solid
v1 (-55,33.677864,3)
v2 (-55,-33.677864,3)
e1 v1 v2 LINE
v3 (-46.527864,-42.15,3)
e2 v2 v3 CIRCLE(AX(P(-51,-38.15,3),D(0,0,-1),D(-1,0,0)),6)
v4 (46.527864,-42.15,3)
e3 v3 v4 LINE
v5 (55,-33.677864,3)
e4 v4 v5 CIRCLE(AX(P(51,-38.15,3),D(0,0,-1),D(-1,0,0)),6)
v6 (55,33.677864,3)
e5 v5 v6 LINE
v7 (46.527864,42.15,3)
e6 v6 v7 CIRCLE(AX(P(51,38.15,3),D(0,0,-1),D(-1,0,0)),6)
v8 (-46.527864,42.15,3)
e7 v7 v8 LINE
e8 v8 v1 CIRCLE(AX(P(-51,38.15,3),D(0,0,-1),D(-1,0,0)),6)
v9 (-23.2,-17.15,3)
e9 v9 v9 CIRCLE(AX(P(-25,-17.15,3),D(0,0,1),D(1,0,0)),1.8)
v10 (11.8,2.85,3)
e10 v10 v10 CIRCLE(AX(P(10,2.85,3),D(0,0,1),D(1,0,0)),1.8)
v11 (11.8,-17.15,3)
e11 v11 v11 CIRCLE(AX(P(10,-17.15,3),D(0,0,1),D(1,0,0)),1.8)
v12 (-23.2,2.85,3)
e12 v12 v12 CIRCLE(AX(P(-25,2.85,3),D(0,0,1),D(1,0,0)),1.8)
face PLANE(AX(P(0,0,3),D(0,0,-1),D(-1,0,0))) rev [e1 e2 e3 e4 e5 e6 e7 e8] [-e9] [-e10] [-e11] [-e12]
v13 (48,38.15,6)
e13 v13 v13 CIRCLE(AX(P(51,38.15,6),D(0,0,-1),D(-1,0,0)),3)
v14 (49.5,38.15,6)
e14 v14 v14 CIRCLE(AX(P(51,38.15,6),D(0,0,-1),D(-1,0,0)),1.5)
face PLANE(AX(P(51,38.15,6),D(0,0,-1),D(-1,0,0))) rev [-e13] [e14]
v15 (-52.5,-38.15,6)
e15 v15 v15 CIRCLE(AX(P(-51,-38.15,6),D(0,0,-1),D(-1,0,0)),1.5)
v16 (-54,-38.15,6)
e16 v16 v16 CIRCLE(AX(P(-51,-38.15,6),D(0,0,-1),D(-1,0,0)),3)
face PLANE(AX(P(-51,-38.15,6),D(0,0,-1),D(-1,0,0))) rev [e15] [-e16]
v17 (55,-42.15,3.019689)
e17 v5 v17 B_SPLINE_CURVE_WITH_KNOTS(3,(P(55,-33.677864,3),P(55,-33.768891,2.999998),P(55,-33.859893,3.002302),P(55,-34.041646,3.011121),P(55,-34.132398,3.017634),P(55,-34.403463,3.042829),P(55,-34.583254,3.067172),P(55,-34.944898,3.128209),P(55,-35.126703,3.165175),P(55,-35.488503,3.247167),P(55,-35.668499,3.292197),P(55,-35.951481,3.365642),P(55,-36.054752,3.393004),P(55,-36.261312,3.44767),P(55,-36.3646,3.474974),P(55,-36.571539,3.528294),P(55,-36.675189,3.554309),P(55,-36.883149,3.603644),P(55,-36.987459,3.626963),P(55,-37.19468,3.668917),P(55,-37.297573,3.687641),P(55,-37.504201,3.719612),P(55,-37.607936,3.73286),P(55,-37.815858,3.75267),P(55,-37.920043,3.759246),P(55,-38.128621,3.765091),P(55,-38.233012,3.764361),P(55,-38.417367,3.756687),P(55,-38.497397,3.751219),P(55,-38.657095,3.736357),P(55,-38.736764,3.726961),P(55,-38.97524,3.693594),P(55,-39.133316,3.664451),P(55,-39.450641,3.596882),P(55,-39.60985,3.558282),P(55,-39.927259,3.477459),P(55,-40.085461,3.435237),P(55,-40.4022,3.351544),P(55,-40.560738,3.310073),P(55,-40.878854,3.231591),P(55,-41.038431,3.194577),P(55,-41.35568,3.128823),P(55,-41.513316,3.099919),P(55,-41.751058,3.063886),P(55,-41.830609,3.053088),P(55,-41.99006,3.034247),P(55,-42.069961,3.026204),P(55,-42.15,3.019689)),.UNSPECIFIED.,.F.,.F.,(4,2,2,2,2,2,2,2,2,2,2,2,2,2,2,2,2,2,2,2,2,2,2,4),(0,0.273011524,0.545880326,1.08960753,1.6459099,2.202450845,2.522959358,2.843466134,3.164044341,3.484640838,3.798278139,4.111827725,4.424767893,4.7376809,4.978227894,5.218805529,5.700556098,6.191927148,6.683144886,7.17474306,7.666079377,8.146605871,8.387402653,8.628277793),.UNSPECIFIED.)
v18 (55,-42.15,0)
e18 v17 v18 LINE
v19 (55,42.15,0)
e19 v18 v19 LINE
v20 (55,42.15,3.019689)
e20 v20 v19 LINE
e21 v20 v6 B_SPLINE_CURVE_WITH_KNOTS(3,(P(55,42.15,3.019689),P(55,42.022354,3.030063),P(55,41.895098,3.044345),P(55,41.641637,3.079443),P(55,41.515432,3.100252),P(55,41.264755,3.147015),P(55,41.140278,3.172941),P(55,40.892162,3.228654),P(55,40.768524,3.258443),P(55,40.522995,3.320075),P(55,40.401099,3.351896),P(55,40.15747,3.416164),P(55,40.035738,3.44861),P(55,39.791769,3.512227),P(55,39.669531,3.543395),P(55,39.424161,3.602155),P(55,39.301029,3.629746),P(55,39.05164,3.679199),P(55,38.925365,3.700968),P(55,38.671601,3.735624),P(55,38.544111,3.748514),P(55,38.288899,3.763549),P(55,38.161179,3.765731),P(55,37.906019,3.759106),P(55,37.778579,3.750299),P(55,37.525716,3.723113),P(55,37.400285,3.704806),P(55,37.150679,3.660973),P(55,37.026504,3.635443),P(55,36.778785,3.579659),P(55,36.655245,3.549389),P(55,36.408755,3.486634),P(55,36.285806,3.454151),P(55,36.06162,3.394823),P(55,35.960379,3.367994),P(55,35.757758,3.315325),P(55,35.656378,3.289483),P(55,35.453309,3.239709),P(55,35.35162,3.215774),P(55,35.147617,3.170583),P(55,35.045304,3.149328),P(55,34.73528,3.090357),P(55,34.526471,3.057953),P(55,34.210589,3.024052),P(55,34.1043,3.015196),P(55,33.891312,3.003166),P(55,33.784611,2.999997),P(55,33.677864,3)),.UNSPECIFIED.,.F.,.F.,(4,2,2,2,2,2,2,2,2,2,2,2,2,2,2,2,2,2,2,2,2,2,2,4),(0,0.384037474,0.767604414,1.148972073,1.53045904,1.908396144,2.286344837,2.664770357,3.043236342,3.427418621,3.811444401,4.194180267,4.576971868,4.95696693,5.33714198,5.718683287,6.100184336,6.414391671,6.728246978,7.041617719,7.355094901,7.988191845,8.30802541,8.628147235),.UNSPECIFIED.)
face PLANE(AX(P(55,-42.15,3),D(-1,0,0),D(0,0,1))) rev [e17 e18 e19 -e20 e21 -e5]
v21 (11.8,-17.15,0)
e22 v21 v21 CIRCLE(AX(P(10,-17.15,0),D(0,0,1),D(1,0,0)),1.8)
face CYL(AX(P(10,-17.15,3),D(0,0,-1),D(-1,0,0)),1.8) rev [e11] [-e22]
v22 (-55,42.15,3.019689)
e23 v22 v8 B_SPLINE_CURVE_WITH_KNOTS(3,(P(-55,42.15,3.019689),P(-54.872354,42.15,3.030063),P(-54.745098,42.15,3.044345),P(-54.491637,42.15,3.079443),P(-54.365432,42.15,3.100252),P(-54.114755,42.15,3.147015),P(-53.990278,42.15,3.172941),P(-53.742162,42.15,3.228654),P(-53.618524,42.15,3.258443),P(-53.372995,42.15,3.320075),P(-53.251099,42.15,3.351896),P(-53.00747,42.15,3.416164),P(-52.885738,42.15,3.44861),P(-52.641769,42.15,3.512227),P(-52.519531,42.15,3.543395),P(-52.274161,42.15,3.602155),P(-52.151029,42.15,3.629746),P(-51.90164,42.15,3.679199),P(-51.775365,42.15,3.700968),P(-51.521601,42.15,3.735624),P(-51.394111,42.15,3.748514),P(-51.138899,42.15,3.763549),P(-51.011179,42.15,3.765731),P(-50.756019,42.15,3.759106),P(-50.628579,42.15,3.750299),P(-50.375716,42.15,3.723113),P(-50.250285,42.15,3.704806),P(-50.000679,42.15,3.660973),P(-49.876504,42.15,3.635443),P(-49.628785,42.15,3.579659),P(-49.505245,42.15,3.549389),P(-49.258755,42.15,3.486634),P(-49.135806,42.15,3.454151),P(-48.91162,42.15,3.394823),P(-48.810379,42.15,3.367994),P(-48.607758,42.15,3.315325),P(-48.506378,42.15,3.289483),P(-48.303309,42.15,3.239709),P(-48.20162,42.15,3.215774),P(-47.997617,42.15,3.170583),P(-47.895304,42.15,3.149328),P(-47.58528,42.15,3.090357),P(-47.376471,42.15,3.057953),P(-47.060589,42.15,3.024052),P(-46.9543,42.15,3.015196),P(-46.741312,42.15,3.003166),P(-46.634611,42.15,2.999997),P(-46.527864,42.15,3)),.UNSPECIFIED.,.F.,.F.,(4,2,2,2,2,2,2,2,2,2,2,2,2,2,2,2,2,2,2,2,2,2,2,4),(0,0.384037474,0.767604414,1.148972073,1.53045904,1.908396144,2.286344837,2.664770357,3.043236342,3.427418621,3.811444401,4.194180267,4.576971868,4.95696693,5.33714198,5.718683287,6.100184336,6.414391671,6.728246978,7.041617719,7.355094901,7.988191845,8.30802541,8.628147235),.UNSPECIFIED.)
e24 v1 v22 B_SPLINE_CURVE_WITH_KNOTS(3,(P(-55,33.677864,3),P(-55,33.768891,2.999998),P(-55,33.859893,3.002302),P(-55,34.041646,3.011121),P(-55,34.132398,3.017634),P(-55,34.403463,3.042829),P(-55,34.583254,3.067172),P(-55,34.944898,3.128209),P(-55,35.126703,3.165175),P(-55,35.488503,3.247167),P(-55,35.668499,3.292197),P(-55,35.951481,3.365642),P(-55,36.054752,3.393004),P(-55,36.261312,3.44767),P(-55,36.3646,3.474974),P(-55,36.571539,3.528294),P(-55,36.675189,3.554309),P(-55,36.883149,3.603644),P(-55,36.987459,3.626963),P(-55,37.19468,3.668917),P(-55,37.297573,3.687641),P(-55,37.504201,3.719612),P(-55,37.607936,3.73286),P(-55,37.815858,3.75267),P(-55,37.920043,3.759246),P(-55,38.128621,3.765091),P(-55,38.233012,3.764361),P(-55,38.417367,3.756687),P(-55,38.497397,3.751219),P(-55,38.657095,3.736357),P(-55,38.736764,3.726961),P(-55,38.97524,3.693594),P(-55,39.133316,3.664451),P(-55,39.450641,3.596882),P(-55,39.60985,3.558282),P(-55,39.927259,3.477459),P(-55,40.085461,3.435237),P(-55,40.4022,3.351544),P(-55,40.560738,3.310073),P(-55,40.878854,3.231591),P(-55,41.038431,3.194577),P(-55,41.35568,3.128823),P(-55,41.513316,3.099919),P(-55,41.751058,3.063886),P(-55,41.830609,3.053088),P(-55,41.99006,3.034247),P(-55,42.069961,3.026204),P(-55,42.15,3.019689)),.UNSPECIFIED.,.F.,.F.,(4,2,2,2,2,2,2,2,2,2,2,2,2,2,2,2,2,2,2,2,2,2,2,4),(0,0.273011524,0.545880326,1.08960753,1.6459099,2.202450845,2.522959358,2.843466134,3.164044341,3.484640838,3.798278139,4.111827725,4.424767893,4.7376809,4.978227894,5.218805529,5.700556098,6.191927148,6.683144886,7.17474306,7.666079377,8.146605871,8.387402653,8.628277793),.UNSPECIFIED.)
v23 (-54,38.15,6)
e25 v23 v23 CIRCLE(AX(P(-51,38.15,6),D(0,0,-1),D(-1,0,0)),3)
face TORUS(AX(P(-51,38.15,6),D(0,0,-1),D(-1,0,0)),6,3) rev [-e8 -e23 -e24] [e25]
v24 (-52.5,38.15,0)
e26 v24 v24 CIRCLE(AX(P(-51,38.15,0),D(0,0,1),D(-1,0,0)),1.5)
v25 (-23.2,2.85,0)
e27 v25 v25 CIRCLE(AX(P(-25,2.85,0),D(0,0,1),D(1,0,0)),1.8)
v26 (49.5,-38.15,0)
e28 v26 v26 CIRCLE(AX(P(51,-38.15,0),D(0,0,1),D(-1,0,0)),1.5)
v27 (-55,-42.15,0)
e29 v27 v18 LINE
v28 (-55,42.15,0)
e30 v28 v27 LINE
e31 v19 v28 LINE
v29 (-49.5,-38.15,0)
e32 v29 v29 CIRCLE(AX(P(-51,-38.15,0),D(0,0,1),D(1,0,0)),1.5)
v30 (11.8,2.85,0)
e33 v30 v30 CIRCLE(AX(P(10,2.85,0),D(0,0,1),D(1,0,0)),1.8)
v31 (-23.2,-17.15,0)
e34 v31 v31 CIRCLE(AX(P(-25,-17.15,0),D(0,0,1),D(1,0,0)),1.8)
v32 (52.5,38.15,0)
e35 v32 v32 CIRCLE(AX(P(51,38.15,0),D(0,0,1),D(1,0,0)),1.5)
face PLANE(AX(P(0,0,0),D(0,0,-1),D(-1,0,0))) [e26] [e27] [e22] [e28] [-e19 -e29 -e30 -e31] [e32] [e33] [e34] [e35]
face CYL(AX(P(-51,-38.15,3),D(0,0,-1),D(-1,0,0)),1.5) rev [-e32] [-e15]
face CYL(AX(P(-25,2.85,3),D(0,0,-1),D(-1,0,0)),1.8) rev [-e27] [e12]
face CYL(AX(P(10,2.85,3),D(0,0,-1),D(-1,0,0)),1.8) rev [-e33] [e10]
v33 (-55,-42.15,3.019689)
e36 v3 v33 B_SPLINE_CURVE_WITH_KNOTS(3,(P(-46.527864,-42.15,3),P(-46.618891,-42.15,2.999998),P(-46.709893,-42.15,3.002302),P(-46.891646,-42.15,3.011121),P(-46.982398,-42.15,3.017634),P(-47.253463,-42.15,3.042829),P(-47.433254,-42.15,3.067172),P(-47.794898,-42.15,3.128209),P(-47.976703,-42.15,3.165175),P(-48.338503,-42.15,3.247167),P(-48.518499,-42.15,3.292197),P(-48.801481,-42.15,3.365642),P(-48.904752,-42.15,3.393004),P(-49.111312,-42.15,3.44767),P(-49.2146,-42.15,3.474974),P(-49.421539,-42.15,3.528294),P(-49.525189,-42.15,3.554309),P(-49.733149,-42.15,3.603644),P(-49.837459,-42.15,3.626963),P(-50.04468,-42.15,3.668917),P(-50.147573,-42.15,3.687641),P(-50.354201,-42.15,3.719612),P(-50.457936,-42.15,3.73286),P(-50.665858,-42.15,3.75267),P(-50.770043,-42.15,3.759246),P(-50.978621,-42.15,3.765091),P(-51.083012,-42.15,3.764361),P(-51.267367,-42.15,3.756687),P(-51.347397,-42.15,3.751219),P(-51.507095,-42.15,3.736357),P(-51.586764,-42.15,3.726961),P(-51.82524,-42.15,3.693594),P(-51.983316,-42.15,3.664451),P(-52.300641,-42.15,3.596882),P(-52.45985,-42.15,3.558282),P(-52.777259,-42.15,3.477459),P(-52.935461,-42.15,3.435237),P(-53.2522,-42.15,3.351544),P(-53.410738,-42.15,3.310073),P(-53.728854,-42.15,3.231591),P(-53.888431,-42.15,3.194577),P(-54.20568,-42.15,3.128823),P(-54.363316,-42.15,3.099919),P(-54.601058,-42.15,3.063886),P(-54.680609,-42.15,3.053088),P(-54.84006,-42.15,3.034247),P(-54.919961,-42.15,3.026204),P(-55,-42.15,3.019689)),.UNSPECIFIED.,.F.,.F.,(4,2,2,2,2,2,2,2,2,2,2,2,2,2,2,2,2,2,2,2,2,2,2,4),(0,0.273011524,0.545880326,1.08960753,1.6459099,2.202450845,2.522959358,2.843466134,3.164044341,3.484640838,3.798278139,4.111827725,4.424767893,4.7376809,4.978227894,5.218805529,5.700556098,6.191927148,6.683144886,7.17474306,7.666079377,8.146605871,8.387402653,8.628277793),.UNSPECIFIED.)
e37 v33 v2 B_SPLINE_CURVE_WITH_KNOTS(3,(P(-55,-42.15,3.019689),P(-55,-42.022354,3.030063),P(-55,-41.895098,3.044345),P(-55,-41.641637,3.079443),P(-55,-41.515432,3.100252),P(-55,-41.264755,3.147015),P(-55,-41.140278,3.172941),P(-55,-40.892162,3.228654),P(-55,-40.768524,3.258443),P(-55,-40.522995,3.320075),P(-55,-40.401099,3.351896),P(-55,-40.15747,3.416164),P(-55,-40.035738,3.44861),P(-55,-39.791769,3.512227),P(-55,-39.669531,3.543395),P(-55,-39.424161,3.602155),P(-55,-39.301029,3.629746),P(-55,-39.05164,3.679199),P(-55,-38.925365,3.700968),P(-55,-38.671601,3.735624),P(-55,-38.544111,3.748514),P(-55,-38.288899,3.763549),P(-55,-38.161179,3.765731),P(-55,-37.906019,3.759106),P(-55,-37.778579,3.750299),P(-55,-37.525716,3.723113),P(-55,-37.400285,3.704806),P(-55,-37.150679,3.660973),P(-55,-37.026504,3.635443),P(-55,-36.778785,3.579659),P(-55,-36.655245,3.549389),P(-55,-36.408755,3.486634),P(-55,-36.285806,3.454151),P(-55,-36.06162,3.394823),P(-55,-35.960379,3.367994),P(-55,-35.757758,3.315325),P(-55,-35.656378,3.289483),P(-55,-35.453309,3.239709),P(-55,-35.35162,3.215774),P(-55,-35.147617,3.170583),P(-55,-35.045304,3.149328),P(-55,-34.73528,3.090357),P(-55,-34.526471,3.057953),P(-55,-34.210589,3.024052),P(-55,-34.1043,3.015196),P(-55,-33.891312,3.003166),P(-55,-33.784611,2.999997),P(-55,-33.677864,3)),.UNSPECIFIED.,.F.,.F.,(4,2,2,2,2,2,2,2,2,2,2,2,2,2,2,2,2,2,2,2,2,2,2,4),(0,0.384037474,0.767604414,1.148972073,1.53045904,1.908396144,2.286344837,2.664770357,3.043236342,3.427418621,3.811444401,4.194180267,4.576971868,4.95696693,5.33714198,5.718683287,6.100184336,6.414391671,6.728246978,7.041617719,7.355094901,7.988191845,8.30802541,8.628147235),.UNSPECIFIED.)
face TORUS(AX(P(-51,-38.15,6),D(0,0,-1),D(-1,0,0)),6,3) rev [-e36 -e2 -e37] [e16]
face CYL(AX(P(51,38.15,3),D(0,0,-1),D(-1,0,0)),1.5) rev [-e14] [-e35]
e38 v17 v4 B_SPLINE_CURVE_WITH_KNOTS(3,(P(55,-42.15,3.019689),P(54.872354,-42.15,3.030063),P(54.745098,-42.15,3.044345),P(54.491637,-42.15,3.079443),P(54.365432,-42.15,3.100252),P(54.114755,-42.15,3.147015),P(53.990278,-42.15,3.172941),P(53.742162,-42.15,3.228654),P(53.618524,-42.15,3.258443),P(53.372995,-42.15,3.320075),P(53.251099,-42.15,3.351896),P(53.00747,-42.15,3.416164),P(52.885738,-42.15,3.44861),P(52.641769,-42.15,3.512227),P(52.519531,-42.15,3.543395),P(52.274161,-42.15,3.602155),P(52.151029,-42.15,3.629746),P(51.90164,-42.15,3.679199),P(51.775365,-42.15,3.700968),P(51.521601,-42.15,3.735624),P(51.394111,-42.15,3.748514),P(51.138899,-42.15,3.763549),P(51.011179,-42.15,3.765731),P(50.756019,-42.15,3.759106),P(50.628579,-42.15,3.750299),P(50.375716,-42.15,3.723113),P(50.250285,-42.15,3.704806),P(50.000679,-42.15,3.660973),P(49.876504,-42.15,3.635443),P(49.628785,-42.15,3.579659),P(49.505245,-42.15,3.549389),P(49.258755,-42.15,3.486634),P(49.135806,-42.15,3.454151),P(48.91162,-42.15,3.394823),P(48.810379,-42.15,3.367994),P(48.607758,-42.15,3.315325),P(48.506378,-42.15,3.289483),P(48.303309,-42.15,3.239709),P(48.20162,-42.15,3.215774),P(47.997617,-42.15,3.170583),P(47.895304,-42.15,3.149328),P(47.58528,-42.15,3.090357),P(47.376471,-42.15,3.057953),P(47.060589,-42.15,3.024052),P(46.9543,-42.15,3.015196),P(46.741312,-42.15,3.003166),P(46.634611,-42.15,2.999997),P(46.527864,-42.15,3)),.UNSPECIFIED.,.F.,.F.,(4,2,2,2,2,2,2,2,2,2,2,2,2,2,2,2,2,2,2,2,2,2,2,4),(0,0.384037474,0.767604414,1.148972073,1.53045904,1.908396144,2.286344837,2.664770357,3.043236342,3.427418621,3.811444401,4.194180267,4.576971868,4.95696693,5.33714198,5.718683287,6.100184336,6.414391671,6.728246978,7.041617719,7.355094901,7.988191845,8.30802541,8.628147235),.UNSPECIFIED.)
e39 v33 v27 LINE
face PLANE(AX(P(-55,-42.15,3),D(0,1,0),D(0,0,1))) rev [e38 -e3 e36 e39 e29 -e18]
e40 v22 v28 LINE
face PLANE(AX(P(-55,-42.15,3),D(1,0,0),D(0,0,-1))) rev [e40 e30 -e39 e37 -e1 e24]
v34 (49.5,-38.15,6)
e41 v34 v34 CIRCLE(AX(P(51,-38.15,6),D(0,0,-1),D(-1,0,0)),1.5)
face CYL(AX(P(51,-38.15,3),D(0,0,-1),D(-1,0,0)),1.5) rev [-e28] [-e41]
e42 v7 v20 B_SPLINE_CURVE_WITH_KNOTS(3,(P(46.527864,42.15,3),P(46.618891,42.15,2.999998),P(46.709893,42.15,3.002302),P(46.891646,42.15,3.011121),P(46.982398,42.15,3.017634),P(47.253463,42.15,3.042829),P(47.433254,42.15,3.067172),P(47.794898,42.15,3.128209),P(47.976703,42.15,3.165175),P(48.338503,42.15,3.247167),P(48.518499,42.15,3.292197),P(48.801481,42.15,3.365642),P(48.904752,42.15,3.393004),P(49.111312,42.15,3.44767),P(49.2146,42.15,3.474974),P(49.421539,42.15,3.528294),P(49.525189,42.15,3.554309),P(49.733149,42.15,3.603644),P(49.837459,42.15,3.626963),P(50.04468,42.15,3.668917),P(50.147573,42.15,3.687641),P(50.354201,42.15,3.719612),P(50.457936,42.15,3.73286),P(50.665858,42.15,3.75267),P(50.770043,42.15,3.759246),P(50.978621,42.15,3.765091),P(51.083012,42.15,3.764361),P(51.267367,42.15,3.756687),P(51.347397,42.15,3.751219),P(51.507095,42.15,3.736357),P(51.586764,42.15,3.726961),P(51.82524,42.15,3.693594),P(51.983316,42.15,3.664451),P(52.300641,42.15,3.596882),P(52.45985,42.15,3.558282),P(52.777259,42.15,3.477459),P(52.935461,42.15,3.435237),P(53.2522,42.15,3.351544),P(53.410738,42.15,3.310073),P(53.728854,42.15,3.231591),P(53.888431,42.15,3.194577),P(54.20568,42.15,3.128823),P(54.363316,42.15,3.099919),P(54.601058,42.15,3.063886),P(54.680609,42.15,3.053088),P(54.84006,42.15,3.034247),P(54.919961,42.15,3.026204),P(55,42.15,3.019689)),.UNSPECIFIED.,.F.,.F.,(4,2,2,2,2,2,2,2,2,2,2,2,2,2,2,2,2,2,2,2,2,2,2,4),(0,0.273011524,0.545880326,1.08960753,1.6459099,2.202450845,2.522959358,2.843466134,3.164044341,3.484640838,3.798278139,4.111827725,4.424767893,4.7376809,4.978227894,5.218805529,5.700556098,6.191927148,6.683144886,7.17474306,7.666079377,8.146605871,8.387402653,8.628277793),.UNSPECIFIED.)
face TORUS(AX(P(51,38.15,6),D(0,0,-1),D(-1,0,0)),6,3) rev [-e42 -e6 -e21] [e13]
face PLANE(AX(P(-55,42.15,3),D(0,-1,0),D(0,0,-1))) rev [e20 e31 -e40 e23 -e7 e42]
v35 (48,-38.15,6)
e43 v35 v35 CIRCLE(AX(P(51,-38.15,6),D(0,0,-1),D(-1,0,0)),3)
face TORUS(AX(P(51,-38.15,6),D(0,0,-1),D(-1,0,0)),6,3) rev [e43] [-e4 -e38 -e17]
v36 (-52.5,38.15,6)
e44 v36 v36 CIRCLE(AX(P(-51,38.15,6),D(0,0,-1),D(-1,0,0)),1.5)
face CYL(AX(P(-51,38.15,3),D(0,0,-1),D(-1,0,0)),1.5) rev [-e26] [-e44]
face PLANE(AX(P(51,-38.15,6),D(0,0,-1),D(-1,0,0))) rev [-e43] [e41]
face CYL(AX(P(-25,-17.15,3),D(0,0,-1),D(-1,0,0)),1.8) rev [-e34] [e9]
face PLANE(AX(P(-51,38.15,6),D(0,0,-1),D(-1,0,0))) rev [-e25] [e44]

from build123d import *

# Parameters (mm, degrees)
SKETCH1_W           = 110
SKETCH1_H           = 84.3
SKETCH1_R           = 1.5
SKETCH1_R_2         = 1.8
BOSS_EXTRUDE1_DEPTH = 3
BOSS_EXTRUDE2_START = 3
SKETCH2_R           = 3
SKETCH2_R_2         = 1.5
BOSS_EXTRUDE2_DEPTH = 3
FILLET1_R           = 3


with BuildPart() as part:
    # Sketch1 → Boss-Extrude1 (new body)
    with BuildSketch(Plane.XY):
        Rectangle(SKETCH1_W, SKETCH1_H)
        with Locations((51, 38.15)):
            Circle(SKETCH1_R, mode=Mode.SUBTRACT)
        with Locations(Location((-51, 38.15, 0), (0, 0, 180))):
            Circle(SKETCH1_R, mode=Mode.SUBTRACT)
        with Locations(Location((51, -38.15, 0), (0, 0, 180))):
            Circle(SKETCH1_R, mode=Mode.SUBTRACT)
        with Locations((-51, -38.15)):
            Circle(SKETCH1_R, mode=Mode.SUBTRACT)
        with Locations((-25, -17.15)):
            Circle(SKETCH1_R_2, mode=Mode.SUBTRACT)
        with Locations((-25, 2.85)):
            Circle(SKETCH1_R_2, mode=Mode.SUBTRACT)
        with Locations((10, 2.85)):
            Circle(SKETCH1_R_2, mode=Mode.SUBTRACT)
        with Locations((10, -17.15)):
            Circle(SKETCH1_R_2, mode=Mode.SUBTRACT)
    extrude(amount=BOSS_EXTRUDE1_DEPTH)

    # Sketch2 → Boss-Extrude2 (add)
    # profile 1 of 4: a face of its own
    with BuildSketch(Plane.XY.offset(BOSS_EXTRUDE2_START)):
        with Locations(Location((-51, 38.15, 0), (0, 0, 180))):
            Circle(SKETCH2_R)
        with Locations(Location((-51, 38.15, 0), (0, 0, 180))):
            Circle(SKETCH2_R_2, mode=Mode.SUBTRACT)
    # profile 2 of 4: a face of its own
    with BuildSketch(Plane.XY.offset(BOSS_EXTRUDE2_START)):
        with Locations(Location((51, 38.15, 0), (0, 0, 180))):
            Circle(SKETCH2_R)
        with Locations(Location((51, 38.15, 0), (0, 0, 180))):
            Circle(SKETCH2_R_2, mode=Mode.SUBTRACT)
    # profile 3 of 4: a face of its own
    with BuildSketch(Plane.XY.offset(BOSS_EXTRUDE2_START)):
        with Locations(Location((51, -38.15, 0), (0, 0, 180))):
            Circle(SKETCH2_R)
        with Locations(Location((51, -38.15, 0), (0, 0, 180))):
            Circle(SKETCH2_R_2, mode=Mode.SUBTRACT)
    # profile 4 of 4: a face of its own
    with BuildSketch(Plane.XY.offset(BOSS_EXTRUDE2_START)):
        with Locations(Location((-51, -38.15, 0), (0, 0, 180))):
            Circle(SKETCH2_R)
        with Locations(Location((-51, -38.15, 0), (0, 0, 180))):
            Circle(SKETCH2_R_2, mode=Mode.SUBTRACT)
    extrude(amount=BOSS_EXTRUDE2_DEPTH)

    # Fillet1
    # the kernel refuses this fillet: 3 mm, written as the material it adds along each edge
    with BuildSketch(Plane(origin=(-51, 38.15, 3), x_dir=(-1, 0, 0), z_dir=(0, 1, 0))) as fillet1_piece_1_section:
        with BuildLine():
            CenterArc((3 + FILLET1_R, FILLET1_R), FILLET1_R, 180, 90)
            Line((3, FILLET1_R), (3, 0))
            Line((3, 0), (3 + FILLET1_R, 0))
        make_face()
    fillet1_piece_1 = revolve(axis=Axis((-51, 38.15, 3), (0, 0, 1)), mode=Mode.PRIVATE)
    fillet1_piece_1 = split(fillet1_piece_1, bisect_by=Plane(origin=(-55, 38.15, 3.853016367), z_dir=(1, 0, 0)), keep=Keep.TOP, mode=Mode.PRIVATE)
    fillet1_piece_1 = split(fillet1_piece_1, bisect_by=Plane(origin=(-47.146983633, 42.15, 3.853016367), z_dir=(0, -1, 0)), keep=Keep.TOP, mode=Mode.PRIVATE)
    add(fillet1_piece_1)
    with BuildSketch(Plane(origin=(51, 38.15, 3), x_dir=(-1, 0, 0), z_dir=(0, 1, 0))) as fillet1_piece_2_section:
        with BuildLine():
            CenterArc((3 + FILLET1_R, FILLET1_R), FILLET1_R, 180, 90)
            Line((3, FILLET1_R), (3, 0))
            Line((3, 0), (3 + FILLET1_R, 0))
        make_face()
    fillet1_piece_2 = revolve(axis=Axis((51, 38.15, 3), (0, 0, 1)), mode=Mode.PRIVATE)
    fillet1_piece_2 = split(fillet1_piece_2, bisect_by=Plane(origin=(55, 38.15, 3.853016383), z_dir=(-1, 0, 0)), keep=Keep.TOP, mode=Mode.PRIVATE)
    fillet1_piece_2 = split(fillet1_piece_2, bisect_by=Plane(origin=(54.853016383, 42.15, 3.853016383), z_dir=(0, -1, 0)), keep=Keep.TOP, mode=Mode.PRIVATE)
    add(fillet1_piece_2)
    with BuildSketch(Plane(origin=(51, -38.15, 3), x_dir=(-1, 0, 0), z_dir=(0, 1, 0))) as fillet1_piece_3_section:
        with BuildLine():
            CenterArc((3 + FILLET1_R, FILLET1_R), FILLET1_R, 180, 90)
            Line((3, FILLET1_R), (3, 0))
            Line((3, 0), (3 + FILLET1_R, 0))
        make_face()
    fillet1_piece_3 = revolve(axis=Axis((51, -38.15, 3), (0, 0, 1)), mode=Mode.PRIVATE)
    fillet1_piece_3 = split(fillet1_piece_3, bisect_by=Plane(origin=(54.853016382, -42.15, 3.853016382), z_dir=(0, 1, 0)), keep=Keep.TOP, mode=Mode.PRIVATE)
    fillet1_piece_3 = split(fillet1_piece_3, bisect_by=Plane(origin=(55, -38.15, 3.853016382), z_dir=(-1, 0, 0)), keep=Keep.TOP, mode=Mode.PRIVATE)
    add(fillet1_piece_3)
    with BuildSketch(Plane(origin=(-51, -38.15, 3), x_dir=(-1, 0, 0), z_dir=(0, 1, 0))) as fillet1_piece_4_section:
        with BuildLine():
            CenterArc((3 + FILLET1_R, FILLET1_R), FILLET1_R, 180, 90)
            Line((3, FILLET1_R), (3, 0))
            Line((3, 0), (3 + FILLET1_R, 0))
        make_face()
    fillet1_piece_4 = revolve(axis=Axis((-51, -38.15, 3), (0, 0, 1)), mode=Mode.PRIVATE)
    fillet1_piece_4 = split(fillet1_piece_4, bisect_by=Plane(origin=(-47.146983624, -42.15, 3.853016376), z_dir=(0, 1, 0)), keep=Keep.TOP, mode=Mode.PRIVATE)
    fillet1_piece_4 = split(fillet1_piece_4, bisect_by=Plane(origin=(-55, -38.15, 3.853016376), z_dir=(1, 0, 0)), keep=Keep.TOP, mode=Mode.PRIVATE)
    add(fillet1_piece_4)


solid = part.part
